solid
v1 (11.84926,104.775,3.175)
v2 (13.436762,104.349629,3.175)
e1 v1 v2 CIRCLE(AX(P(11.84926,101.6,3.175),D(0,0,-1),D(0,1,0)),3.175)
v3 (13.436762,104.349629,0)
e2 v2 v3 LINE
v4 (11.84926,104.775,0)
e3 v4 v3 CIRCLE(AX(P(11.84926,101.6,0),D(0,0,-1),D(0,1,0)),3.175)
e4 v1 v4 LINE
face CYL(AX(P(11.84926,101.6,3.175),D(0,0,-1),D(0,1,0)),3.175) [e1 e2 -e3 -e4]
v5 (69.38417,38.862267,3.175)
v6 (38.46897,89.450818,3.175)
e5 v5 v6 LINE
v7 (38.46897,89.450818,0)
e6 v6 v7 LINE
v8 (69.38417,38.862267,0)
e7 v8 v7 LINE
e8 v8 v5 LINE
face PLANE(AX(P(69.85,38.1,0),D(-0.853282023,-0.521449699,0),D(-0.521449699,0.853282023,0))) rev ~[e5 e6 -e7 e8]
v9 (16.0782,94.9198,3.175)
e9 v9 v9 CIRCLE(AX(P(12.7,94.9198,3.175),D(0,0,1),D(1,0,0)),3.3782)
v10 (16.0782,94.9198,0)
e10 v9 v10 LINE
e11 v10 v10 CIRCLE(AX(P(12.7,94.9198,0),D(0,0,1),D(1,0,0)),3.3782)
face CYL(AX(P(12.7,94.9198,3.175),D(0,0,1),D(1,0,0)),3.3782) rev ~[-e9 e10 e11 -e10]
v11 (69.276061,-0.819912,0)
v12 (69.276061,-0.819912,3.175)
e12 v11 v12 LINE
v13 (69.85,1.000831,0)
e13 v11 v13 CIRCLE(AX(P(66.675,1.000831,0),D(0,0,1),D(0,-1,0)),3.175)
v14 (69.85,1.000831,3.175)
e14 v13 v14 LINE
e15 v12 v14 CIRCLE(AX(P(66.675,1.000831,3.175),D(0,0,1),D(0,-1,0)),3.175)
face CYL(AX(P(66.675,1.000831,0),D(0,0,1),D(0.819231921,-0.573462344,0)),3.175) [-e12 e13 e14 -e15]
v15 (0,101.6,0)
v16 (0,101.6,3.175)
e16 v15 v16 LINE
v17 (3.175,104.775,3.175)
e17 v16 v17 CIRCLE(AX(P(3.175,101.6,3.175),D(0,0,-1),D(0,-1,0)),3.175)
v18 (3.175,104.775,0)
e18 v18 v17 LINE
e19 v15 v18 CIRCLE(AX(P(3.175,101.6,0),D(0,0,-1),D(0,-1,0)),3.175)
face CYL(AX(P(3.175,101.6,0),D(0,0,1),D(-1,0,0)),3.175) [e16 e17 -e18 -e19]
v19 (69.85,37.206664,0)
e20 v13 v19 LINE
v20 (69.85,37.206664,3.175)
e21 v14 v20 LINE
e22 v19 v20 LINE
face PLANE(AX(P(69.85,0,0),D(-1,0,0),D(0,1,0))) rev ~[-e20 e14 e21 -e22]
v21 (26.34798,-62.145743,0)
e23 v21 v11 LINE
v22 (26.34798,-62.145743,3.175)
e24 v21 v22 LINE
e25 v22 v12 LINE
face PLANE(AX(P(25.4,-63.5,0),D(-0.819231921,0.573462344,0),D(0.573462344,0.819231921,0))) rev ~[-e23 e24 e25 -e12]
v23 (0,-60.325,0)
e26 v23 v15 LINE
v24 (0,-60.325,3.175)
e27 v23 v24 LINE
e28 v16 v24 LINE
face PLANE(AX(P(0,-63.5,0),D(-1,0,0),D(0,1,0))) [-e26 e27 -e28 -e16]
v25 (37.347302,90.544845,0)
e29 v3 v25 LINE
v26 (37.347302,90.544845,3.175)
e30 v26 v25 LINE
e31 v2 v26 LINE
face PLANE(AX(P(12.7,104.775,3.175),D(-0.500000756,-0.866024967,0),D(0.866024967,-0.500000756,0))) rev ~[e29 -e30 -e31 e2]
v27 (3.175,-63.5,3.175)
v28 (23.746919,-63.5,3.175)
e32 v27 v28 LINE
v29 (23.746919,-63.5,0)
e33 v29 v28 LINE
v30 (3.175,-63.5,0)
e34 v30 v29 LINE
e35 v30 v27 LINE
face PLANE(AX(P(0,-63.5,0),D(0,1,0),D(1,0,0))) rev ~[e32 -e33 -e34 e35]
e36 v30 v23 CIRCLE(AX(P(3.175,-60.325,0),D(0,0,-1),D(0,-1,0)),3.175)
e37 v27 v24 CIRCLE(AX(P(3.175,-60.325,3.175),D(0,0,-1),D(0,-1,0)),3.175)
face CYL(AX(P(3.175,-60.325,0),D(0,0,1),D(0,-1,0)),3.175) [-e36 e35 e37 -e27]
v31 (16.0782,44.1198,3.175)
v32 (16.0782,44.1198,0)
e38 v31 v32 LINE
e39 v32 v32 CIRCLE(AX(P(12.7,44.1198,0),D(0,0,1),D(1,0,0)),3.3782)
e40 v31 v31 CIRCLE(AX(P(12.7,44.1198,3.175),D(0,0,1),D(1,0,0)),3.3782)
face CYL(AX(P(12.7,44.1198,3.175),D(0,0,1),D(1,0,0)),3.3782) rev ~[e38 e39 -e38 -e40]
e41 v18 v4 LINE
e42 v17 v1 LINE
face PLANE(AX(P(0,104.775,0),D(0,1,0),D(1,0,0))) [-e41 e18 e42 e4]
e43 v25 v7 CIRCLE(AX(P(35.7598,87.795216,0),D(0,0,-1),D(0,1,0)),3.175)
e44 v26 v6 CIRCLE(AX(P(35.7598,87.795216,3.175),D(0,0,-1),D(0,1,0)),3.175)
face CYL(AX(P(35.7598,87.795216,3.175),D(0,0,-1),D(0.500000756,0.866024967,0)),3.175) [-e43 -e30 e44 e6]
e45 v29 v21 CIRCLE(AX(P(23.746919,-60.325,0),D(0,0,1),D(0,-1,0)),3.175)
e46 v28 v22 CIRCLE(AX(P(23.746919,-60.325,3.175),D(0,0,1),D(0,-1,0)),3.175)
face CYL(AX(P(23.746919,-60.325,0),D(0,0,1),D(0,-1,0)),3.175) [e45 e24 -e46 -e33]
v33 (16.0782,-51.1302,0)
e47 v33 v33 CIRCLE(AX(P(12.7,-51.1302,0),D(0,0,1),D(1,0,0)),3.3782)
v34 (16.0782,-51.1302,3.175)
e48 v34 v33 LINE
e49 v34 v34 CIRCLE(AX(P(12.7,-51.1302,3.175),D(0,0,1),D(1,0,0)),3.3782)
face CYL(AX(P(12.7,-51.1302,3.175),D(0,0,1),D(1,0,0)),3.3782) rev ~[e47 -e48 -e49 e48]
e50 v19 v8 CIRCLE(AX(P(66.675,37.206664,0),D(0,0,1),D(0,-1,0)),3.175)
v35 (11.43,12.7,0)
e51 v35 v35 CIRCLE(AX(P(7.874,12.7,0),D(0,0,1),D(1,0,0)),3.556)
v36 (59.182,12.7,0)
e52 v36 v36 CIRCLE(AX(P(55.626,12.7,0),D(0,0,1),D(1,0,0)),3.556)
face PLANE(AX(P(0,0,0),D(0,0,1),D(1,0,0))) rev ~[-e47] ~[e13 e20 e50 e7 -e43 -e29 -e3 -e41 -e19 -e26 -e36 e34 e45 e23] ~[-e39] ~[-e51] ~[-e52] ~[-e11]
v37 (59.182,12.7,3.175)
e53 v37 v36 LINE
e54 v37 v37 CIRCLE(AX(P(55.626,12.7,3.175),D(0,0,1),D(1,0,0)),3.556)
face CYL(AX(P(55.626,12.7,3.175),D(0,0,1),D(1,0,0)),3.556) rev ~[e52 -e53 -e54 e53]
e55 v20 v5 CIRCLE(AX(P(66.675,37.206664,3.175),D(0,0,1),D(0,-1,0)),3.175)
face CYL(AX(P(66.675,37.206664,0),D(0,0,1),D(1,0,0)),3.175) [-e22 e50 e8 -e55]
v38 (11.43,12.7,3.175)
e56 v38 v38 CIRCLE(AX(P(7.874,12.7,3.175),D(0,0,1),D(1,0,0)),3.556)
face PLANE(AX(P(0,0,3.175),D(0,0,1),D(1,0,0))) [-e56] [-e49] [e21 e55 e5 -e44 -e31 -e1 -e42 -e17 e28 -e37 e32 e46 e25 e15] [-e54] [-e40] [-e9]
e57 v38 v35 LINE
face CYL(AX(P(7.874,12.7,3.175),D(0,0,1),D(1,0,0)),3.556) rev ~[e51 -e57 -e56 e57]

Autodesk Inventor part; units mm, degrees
ref_plane "YZ Plane" through (0, 0, 0) normal (1, 0, 0) x (0, 1, 0)
ref_plane "XZ Plane" through (0, 0, 0) normal (0, 1, 0) x (-1, 0, 0)
ref_plane "XY Plane" through (0, 0, 0) normal (0, 0, 1) x (1, 0, 0)
sketch "Sketch1" plane through (0, 0, 0) normal (0, 0, 1) x (1, 0, 0)
  line L0 (69.85, 0) -> (69.85, 38.1)
  line L1 (69.85, 38.1) -> (29.1042, 104.775)
  line L2 (0, 104.775) -> (0, 0)
  line L3 (0, -63.5) -> (0, 0)
  line L4 (0, 104.775) -> (29.1042, 104.775)
  line L5 (0, -63.5) -> (25.4, -63.5)
  line L6 (25.4, -63.5) -> (69.85, 0)
  dimension "d1" = 38.1
  dimension "d24" = 63.5
  dimension "d25" = 69.85
  dimension "d26" = 69.85
  dimension "d36" = 104.775
  dimension "d38" = 121.43
  dimension "d45" = 25.4
extrude "Extrusion1" add sketch "Sketch1" along normal blind 3.175
sketch "Sketch2" plane through (0, 0, 3.175) normal (0, 0, 1) x (1, 0, 0)
  line L0 (0, 0) -> (69.85, 0) projected
  line L1 (69.85, 0) -> (69.85, 38.1) projected
  line L2 (0, 104.775) -> (0, -63.5) projected
  circle A0 centre (7.874, 12.7) radius 3.556
  circle A1 centre (55.626, 12.7) radius 3.556
  point P0 (0, 152.4)
  dimension "d5" = 7.112
  dimension "d6" = 7.112
  dimension "d7" = 12.7
  dimension "d8" = 12.7
  dimension "d9" = 14.224
  dimension "d11" = 7.874
extrude "Extrusion2" cut sketch "Sketch2" against normal blind 25.4
sketch "Sketch3" plane through (0, 0, 3.175) normal (0, 0, 1) x (1, 0, 0)
  line L0 (0, 104.775) -> (0, -63.5) projected
  line L1 (0, 0) -> (69.85, 0) projected
  circle A0 centre (12.7, 94.9198) radius 3.3782
  circle A1 centre (12.7, 44.1198) radius 3.3782
  point P0 (0, 141.1158)
  dimension "d15" = 6.7564
  dimension "d16" = 6.7564
  dimension "d17" = 12.7
  dimension "d18" = 12.7
  dimension "d19" = 44.1198
  dimension "d20" = 50.8
extrude "Extrusion3" cut sketch "Sketch3" against normal blind 25.4
fillet "Fillet2" radius 3.175 2 edges at (69.85, 0, 1.5875) (69.85, 38.1, 1.5875)
fillet "Fillet3" radius 3.175 1 edges at (0, -63.5, 1.5875)
sketch "Sketch4" plane through (0, 0, 3.175) normal (0, 0, 1) x (1, 0, 0)
  line L0 (0, 104.775) -> (0, -60.325) projected
  circle A0 centre (12.7, 44.1198) radius 3.3782 projected
  circle A1 centre (12.7, -51.1302) radius 3.3782
  point P0 (0, 141.1158)
  point P1 (0, 0)
  dimension "d28" = 6.7564
  dimension "d29" = 95.25
  dimension "d30" = 12.7
extrude "Extrusion4" cut sketch "Sketch4" against normal blind 25.4 contours A1
sketch "Sketch5" plane through (0, 0, 3.175) normal (0, 0, 1) x (1, 0, 0)
  circle A0 centre (12.7, 44.1198) radius 3.3782 projected
  circle A1 centre (12.7, 94.9198) radius 3.3782 projected
  point P0 (0, 0)
extrude "Extrusion5" cut sketch "Sketch5" against normal blind 25.4
fillet "Fillet4" radius 3.175 2 edges at (29.1042, 104.775, 1.5875) (0, 104.775, 1.5875)
sketch "Sketch6" plane through (0, 0, 3.175) normal (0, 0, 1) x (1, 0, 0)
  line L0 (0, 101.6) -> (0, -60.325) projected
  line L1 (69.3842, 38.8623) -> (30.0327, 103.2556) projected
  arc A0 (30.0327, 103.2556) -> (27.3235, 104.775) centre (27.3235, 101.6) ccw projected
  line L2 (27.3235, 104.775) -> (3.175, 104.775) projected
  line L3 (12.7, 104.775) -> (38.0473, 90.1407)
  point P0 (0, 0)
  dimension "d40" = 30
  dimension "d41" = 12.7
extrude "Extrusion6" cut sketch "Sketch6" against normal blind 25.4
fillet "Fillet5" radius 3.175 2 edges at (12.7, 104.775, 1.5875) (38.0473, 90.1407, 1.5875)
fillet "Fillet6" radius 3.175 1 edges at (25.4, -63.5, 1.5875)
properties part number "Ninja left cylinder support bracket" material "Aluminum 6061"
